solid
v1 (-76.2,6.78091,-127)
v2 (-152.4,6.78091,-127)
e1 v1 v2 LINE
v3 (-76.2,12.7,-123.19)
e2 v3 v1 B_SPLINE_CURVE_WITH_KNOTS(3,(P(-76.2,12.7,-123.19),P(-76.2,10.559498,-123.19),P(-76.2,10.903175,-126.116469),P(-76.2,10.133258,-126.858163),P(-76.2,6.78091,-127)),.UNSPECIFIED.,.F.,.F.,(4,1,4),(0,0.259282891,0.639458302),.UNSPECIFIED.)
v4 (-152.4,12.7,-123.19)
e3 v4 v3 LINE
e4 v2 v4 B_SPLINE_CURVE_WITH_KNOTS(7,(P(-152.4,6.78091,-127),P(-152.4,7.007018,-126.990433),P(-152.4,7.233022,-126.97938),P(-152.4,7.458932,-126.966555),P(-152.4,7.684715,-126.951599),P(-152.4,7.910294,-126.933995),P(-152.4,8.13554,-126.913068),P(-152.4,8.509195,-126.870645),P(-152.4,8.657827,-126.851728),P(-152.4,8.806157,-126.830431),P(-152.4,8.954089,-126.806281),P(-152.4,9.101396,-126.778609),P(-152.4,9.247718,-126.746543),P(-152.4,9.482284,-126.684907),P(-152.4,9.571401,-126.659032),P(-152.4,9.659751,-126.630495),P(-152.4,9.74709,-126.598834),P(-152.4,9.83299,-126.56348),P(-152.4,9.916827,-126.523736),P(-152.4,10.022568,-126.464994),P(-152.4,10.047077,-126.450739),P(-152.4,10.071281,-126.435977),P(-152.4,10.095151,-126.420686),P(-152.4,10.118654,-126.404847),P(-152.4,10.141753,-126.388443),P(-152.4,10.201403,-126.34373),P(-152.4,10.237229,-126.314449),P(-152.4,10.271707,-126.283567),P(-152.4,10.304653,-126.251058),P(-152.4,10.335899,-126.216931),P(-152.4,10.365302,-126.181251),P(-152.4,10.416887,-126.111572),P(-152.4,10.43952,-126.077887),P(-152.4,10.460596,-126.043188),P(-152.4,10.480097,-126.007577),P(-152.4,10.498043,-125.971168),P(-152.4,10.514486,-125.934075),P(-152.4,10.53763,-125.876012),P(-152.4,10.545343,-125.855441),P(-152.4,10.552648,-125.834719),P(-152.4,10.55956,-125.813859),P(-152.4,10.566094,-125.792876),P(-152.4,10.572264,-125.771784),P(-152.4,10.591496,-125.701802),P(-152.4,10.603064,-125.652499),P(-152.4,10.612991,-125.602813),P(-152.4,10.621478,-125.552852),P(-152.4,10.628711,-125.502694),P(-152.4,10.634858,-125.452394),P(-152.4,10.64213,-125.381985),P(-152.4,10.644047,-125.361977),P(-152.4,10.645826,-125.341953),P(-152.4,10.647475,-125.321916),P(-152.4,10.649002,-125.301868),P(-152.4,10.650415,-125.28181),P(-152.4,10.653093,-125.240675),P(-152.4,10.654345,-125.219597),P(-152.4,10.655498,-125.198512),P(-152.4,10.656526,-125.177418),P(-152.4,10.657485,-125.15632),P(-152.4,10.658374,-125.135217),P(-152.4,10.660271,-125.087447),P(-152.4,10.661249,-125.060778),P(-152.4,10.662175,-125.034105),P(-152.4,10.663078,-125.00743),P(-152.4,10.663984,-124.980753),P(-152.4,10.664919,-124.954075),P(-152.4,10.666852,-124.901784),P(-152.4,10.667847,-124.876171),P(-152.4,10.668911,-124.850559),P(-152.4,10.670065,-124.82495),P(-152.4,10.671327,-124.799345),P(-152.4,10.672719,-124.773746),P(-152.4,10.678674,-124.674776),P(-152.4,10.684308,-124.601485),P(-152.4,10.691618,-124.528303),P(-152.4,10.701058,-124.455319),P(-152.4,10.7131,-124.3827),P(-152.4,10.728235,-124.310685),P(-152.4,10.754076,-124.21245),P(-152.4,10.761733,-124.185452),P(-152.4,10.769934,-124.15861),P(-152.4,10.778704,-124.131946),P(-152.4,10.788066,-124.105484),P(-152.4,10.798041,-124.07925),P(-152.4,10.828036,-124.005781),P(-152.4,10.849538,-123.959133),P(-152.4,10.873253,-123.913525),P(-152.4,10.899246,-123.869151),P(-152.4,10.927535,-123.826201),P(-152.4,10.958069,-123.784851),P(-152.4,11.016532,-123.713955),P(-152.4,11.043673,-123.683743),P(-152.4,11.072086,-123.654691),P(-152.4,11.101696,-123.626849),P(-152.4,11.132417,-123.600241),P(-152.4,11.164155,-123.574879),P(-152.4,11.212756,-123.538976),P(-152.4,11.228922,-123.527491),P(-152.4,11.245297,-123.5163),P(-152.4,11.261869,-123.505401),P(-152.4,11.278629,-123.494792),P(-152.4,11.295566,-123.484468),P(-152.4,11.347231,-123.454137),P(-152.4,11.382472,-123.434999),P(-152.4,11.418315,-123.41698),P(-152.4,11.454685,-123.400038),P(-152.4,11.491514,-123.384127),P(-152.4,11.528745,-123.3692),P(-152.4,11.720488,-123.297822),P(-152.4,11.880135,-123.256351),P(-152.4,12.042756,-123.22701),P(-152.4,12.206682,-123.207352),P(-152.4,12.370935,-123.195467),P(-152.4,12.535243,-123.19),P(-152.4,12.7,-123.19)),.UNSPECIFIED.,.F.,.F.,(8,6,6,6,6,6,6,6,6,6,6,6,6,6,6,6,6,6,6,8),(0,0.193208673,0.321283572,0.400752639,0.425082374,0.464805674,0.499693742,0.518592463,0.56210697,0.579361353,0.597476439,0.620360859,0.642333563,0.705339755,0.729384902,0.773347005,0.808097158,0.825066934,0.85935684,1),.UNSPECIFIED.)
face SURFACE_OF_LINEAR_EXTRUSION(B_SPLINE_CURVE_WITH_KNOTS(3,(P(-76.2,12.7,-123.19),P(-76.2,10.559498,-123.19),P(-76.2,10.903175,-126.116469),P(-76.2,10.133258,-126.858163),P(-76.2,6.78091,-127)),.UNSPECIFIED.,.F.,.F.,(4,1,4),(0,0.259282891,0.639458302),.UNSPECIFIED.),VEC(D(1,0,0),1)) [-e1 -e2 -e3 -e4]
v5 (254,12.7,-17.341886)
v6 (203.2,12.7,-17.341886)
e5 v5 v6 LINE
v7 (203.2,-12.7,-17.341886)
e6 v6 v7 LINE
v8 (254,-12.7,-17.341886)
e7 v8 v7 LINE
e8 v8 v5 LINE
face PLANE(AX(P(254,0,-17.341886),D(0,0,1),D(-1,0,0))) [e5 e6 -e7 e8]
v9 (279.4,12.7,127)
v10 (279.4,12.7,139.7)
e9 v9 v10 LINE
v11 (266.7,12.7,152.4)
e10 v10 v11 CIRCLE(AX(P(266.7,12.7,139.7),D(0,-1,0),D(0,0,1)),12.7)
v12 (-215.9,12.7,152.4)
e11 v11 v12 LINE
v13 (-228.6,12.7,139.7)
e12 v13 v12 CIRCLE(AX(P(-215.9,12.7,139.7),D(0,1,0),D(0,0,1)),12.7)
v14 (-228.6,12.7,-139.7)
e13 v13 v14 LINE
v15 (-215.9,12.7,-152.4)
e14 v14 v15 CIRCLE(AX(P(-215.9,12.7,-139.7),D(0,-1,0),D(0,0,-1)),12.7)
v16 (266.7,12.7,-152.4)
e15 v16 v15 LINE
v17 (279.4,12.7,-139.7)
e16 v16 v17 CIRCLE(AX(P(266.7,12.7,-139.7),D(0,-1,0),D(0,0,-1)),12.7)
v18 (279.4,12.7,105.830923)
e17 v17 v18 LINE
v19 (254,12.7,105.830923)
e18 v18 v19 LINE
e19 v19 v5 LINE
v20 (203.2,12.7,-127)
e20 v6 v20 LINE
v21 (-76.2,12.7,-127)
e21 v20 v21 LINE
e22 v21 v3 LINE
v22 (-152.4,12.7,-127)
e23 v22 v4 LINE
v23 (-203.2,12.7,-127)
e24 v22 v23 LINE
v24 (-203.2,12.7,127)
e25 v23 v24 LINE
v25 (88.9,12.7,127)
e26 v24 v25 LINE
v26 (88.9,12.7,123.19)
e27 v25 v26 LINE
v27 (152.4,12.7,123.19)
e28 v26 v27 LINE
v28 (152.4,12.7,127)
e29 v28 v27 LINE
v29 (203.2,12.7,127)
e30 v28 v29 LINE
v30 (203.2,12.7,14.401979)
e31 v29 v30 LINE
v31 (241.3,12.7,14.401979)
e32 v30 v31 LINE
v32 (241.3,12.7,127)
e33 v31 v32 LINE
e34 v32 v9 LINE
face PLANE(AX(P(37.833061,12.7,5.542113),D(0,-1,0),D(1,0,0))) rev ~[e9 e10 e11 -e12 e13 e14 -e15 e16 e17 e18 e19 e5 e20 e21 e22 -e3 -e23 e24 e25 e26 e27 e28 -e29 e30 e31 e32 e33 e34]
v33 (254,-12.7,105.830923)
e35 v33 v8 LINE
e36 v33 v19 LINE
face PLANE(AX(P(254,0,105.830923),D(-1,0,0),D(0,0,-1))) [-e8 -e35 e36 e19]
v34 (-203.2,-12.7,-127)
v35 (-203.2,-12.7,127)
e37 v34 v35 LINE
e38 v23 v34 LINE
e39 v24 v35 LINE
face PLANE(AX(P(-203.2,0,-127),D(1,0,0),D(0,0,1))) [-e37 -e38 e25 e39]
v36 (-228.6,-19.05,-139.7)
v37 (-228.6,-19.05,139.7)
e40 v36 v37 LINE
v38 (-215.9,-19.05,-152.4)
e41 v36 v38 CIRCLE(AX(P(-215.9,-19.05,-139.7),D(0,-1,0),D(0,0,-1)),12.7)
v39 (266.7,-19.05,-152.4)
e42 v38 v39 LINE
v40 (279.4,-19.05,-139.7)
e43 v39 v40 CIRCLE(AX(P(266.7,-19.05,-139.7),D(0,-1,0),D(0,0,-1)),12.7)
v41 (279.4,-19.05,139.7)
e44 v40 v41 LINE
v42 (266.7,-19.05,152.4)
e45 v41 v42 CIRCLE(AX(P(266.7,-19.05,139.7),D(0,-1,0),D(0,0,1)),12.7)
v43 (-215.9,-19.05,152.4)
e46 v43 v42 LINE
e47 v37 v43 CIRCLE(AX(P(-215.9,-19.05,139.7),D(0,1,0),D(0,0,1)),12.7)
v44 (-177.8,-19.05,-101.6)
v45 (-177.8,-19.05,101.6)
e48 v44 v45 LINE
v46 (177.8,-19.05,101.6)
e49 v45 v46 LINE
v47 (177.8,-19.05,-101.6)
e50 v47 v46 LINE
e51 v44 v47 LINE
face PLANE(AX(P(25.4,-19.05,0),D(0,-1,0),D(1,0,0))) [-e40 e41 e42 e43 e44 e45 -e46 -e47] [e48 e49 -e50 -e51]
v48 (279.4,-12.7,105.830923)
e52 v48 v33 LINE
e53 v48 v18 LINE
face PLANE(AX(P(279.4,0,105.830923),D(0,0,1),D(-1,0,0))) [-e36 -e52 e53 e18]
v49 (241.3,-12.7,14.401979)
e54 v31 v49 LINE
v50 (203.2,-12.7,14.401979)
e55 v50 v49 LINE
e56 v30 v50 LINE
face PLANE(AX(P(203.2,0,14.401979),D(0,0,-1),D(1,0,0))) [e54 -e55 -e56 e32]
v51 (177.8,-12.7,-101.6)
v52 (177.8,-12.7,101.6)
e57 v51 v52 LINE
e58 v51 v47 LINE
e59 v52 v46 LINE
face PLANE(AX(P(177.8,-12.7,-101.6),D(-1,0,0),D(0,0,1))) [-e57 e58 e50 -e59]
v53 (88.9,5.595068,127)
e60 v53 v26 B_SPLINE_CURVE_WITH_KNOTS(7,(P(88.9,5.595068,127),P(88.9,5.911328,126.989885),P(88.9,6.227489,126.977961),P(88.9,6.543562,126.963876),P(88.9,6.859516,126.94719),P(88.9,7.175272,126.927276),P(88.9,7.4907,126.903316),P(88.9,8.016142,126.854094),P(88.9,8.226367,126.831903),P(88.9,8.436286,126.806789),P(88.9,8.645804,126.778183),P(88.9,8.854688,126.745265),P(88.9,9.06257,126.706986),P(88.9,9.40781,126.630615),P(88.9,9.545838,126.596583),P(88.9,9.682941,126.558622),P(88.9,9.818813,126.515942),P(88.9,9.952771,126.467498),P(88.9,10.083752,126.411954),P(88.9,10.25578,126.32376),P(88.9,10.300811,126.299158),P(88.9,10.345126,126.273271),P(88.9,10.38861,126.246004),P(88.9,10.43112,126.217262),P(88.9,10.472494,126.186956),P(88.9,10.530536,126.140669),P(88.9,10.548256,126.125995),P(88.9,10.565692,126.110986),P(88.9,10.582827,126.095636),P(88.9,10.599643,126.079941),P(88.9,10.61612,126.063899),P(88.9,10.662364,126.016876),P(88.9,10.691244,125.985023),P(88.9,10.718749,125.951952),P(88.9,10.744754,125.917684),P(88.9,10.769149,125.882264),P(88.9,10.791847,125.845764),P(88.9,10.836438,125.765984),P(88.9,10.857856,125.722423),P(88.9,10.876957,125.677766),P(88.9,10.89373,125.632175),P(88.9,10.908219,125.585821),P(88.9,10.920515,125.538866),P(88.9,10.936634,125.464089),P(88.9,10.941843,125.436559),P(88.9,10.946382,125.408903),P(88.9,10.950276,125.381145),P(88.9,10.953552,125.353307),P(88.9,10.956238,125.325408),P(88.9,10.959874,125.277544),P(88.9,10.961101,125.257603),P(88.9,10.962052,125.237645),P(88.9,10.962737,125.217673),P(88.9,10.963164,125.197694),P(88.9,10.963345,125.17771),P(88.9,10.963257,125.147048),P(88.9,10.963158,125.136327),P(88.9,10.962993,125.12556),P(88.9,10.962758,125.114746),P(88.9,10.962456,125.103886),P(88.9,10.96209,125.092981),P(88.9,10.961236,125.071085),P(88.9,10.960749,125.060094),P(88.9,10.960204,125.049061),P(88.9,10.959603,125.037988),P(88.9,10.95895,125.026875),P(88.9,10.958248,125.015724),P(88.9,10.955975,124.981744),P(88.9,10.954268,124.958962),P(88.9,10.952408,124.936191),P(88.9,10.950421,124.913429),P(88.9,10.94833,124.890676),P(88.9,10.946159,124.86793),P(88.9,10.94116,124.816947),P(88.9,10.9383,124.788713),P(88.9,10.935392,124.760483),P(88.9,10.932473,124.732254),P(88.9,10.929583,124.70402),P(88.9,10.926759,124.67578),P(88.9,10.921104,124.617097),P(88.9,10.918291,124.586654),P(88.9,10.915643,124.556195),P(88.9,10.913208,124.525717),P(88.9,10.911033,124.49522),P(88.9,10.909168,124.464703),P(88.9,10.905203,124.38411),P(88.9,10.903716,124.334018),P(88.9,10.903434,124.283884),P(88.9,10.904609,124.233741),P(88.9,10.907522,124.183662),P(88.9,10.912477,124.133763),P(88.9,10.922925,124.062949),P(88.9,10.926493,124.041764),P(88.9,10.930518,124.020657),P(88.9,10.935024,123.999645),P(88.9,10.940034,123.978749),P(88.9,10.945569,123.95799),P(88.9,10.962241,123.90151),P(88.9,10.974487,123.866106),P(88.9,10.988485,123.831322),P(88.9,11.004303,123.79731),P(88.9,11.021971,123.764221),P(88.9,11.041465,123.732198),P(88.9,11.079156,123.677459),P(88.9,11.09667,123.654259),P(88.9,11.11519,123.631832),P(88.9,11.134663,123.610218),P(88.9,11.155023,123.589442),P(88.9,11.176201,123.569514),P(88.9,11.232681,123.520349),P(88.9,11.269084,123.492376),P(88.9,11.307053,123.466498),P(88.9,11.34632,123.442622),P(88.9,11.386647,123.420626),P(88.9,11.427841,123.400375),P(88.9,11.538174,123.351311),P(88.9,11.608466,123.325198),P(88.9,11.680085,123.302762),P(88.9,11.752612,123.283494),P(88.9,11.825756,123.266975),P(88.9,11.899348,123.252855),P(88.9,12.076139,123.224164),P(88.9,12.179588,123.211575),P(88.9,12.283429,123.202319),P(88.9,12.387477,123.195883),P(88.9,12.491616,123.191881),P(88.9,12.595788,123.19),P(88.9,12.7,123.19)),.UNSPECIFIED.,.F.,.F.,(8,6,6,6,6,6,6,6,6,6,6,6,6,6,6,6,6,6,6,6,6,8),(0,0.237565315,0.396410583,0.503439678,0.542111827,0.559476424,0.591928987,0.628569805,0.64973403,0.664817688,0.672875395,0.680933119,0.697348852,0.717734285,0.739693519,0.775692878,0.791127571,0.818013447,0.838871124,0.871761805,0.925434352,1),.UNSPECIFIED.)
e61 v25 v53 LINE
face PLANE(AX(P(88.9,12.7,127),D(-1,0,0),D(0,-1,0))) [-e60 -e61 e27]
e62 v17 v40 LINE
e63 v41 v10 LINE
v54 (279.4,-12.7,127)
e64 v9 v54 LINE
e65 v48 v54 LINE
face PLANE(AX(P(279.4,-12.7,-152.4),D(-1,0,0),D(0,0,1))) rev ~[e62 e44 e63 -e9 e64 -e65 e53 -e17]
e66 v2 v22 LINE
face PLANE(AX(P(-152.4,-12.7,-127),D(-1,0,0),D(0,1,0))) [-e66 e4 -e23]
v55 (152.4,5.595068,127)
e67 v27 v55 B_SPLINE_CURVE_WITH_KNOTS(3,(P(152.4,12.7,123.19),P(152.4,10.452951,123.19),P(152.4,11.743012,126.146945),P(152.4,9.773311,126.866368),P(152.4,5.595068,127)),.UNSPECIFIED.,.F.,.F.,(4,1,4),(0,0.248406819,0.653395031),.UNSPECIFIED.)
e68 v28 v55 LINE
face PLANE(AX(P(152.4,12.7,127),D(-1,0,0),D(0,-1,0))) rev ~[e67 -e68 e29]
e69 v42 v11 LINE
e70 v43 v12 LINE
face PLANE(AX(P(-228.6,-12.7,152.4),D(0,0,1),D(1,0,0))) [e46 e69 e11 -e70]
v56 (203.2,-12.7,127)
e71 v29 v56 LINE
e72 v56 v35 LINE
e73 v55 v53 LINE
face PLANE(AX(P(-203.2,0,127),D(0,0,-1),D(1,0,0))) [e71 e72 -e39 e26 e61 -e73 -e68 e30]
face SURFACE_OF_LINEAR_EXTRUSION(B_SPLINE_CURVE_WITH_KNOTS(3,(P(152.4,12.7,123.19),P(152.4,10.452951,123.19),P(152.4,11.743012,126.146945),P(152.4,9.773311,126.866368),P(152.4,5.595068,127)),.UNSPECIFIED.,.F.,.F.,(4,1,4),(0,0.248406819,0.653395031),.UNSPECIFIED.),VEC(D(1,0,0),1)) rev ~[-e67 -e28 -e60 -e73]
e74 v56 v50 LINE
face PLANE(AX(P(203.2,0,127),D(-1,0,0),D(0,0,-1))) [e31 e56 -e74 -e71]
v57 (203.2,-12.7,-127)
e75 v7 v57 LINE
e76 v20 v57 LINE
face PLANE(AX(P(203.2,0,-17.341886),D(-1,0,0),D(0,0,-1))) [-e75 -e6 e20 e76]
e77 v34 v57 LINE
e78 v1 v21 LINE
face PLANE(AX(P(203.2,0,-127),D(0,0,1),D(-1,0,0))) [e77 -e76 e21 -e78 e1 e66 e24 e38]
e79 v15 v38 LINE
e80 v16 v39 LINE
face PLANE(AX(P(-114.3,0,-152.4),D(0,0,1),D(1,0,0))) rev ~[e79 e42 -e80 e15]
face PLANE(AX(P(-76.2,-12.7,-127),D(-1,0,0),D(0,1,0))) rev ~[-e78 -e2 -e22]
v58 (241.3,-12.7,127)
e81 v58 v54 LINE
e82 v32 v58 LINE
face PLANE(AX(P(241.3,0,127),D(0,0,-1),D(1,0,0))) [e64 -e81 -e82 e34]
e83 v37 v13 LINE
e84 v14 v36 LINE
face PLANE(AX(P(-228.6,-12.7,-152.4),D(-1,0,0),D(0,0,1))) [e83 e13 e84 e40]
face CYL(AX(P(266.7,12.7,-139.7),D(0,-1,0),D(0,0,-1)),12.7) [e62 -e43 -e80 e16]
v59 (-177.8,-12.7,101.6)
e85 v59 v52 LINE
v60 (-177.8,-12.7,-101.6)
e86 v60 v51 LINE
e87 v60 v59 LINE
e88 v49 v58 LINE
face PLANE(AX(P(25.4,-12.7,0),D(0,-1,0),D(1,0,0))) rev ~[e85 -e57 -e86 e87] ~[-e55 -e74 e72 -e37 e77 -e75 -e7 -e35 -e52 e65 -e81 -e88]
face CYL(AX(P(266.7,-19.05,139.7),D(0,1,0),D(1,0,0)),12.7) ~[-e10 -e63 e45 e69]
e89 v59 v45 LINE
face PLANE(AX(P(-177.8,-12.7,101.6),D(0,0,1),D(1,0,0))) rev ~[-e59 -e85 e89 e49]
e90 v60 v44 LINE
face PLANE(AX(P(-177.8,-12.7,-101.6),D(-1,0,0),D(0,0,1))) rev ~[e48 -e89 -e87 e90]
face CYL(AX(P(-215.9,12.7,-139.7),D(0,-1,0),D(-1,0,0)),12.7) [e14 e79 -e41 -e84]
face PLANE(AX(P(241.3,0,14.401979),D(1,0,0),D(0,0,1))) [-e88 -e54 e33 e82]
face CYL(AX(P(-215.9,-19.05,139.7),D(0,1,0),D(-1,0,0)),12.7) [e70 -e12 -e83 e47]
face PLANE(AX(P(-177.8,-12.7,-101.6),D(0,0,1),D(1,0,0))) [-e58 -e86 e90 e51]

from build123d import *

# Parameters (mm, degrees)
F1_DEPTH      = 12.7
F2_W          = 508
F2_H          = 304.8
F2_W_2        = 355.6
F2_H_2        = 203.2
F3_DEPTH      = 6.35
F4_R          = 12.7
F5_W          = 76.2
F5_H          = 25.4
F6_DEPTH      = 3.81
F6_DEPTH_BACK = 25.4
F8_DEPTH      = 87.376
F9_W          = 63.5
F9_H          = 25.4
F10_DEPTH     = 3.81
F12_DEPTH     = 76.2


with BuildPart() as f1:
    # F0 (on Front) → F1 (new body, symmetric)
    with BuildSketch(Plane.XZ):
        Polygon((254, -17.3418857157), (203.2, -17.3418857157), (203.2, -127), (-203.2, -127), (-203.2, 127), (203.2, 127), (203.2, 14.4019788131), (241.3, 14.4019788131), (241.3, 127), (279.4, 127), (279.4, 152.4), (254, 152.4), (241.3, 152.4), (-228.6, 152.4), (-228.6, -152.4), (279.4, -152.4), (279.4, 105.8309227228), (254, 105.8309227228), (254, 0), align=None)
    extrude(amount=F1_DEPTH, both=True)

    # F2 (on face) → F3 (join)
    with BuildSketch(Plane.XZ.offset(12.7)):
        with Locations((25.4, 0)):
            Rectangle(F2_W, F2_H)
        Rectangle(F2_W_2, F2_H_2, mode=Mode.SUBTRACT)
    extrude(amount=F3_DEPTH)

    # F4
    f4_edges = [f1.edges().sort_by_distance(p)[0] for p in [
        (279.4, -3.175, -152.4),
        (-228.6, -3.175, -152.4),
        (-228.6, -3.175, 152.4),
        (279.4, -3.175, 152.4),
    ]]
    fillet(f4_edges, radius=F4_R)

    # F5 (on face) → F6 (join, two sides)
    with BuildSketch(Plane.XY.offset(-127)) as f6_sk:
        with Locations((-114.3, 0)):
            Rectangle(F5_W, F5_H)
    extrude(amount=F6_DEPTH)
    extrude(f6_sk.sketch, amount=-F6_DEPTH_BACK)

    # F7 (on face) → F8 (cut)
    with BuildSketch(Plane.YZ.offset(-76.2)):
        with BuildLine():
            add(Edge.make_bspline(
                [(12.7, -123.19), (10.5594976368, -123.19), (10.9031747427, -126.1164686911), (10.1332584811, -126.8581633475), (6.7809096129, -127)],
                knots=[0, 0, 0, 0, 0.2592828913, 0.6394583018, 0.6394583018, 0.6394583018, 0.6394583018], degree=3))
            Line((12.7, -123.19), (-12.7, -123.19))
            Line((-12.7, -123.19), (-12.7, -127))
            Line((-12.7, -127), (6.7809096129, -127))
        make_face()
    extrude(amount=-F8_DEPTH, mode=Mode.SUBTRACT)

    # F9 (on face) → F10 (join)
    with BuildSketch(Plane(origin=(0, 0, 127), x_dir=(1, 0, 0), z_dir=(0, 0, -1))):
        with Locations((120.65, 0)):
            Rectangle(F9_W, F9_H)
    extrude(amount=F10_DEPTH)

    # F11 (on face) → F12 (cut)
    with BuildSketch(Plane.YZ.offset(152.4)):
        with BuildLine():
            Line((-12.7, 123.19), (12.7, 123.19))
            add(Edge.make_bspline(
                [(12.7, 123.19), (10.4529513046, 123.19), (11.7430118211, 126.146945185), (9.7733114077, 126.8663682916), (5.5950677895, 127)],
                knots=[0, 0, 0, 0, 0.2484068186, 0.6533950313, 0.6533950313, 0.6533950313, 0.6533950313], degree=3))
            Line((5.5950677895, 127), (-12.7, 127))
            Line((-12.7, 127), (-12.7, 123.19))
        make_face()
    extrude(amount=-F12_DEPTH, mode=Mode.SUBTRACT)


solid = f1.part
